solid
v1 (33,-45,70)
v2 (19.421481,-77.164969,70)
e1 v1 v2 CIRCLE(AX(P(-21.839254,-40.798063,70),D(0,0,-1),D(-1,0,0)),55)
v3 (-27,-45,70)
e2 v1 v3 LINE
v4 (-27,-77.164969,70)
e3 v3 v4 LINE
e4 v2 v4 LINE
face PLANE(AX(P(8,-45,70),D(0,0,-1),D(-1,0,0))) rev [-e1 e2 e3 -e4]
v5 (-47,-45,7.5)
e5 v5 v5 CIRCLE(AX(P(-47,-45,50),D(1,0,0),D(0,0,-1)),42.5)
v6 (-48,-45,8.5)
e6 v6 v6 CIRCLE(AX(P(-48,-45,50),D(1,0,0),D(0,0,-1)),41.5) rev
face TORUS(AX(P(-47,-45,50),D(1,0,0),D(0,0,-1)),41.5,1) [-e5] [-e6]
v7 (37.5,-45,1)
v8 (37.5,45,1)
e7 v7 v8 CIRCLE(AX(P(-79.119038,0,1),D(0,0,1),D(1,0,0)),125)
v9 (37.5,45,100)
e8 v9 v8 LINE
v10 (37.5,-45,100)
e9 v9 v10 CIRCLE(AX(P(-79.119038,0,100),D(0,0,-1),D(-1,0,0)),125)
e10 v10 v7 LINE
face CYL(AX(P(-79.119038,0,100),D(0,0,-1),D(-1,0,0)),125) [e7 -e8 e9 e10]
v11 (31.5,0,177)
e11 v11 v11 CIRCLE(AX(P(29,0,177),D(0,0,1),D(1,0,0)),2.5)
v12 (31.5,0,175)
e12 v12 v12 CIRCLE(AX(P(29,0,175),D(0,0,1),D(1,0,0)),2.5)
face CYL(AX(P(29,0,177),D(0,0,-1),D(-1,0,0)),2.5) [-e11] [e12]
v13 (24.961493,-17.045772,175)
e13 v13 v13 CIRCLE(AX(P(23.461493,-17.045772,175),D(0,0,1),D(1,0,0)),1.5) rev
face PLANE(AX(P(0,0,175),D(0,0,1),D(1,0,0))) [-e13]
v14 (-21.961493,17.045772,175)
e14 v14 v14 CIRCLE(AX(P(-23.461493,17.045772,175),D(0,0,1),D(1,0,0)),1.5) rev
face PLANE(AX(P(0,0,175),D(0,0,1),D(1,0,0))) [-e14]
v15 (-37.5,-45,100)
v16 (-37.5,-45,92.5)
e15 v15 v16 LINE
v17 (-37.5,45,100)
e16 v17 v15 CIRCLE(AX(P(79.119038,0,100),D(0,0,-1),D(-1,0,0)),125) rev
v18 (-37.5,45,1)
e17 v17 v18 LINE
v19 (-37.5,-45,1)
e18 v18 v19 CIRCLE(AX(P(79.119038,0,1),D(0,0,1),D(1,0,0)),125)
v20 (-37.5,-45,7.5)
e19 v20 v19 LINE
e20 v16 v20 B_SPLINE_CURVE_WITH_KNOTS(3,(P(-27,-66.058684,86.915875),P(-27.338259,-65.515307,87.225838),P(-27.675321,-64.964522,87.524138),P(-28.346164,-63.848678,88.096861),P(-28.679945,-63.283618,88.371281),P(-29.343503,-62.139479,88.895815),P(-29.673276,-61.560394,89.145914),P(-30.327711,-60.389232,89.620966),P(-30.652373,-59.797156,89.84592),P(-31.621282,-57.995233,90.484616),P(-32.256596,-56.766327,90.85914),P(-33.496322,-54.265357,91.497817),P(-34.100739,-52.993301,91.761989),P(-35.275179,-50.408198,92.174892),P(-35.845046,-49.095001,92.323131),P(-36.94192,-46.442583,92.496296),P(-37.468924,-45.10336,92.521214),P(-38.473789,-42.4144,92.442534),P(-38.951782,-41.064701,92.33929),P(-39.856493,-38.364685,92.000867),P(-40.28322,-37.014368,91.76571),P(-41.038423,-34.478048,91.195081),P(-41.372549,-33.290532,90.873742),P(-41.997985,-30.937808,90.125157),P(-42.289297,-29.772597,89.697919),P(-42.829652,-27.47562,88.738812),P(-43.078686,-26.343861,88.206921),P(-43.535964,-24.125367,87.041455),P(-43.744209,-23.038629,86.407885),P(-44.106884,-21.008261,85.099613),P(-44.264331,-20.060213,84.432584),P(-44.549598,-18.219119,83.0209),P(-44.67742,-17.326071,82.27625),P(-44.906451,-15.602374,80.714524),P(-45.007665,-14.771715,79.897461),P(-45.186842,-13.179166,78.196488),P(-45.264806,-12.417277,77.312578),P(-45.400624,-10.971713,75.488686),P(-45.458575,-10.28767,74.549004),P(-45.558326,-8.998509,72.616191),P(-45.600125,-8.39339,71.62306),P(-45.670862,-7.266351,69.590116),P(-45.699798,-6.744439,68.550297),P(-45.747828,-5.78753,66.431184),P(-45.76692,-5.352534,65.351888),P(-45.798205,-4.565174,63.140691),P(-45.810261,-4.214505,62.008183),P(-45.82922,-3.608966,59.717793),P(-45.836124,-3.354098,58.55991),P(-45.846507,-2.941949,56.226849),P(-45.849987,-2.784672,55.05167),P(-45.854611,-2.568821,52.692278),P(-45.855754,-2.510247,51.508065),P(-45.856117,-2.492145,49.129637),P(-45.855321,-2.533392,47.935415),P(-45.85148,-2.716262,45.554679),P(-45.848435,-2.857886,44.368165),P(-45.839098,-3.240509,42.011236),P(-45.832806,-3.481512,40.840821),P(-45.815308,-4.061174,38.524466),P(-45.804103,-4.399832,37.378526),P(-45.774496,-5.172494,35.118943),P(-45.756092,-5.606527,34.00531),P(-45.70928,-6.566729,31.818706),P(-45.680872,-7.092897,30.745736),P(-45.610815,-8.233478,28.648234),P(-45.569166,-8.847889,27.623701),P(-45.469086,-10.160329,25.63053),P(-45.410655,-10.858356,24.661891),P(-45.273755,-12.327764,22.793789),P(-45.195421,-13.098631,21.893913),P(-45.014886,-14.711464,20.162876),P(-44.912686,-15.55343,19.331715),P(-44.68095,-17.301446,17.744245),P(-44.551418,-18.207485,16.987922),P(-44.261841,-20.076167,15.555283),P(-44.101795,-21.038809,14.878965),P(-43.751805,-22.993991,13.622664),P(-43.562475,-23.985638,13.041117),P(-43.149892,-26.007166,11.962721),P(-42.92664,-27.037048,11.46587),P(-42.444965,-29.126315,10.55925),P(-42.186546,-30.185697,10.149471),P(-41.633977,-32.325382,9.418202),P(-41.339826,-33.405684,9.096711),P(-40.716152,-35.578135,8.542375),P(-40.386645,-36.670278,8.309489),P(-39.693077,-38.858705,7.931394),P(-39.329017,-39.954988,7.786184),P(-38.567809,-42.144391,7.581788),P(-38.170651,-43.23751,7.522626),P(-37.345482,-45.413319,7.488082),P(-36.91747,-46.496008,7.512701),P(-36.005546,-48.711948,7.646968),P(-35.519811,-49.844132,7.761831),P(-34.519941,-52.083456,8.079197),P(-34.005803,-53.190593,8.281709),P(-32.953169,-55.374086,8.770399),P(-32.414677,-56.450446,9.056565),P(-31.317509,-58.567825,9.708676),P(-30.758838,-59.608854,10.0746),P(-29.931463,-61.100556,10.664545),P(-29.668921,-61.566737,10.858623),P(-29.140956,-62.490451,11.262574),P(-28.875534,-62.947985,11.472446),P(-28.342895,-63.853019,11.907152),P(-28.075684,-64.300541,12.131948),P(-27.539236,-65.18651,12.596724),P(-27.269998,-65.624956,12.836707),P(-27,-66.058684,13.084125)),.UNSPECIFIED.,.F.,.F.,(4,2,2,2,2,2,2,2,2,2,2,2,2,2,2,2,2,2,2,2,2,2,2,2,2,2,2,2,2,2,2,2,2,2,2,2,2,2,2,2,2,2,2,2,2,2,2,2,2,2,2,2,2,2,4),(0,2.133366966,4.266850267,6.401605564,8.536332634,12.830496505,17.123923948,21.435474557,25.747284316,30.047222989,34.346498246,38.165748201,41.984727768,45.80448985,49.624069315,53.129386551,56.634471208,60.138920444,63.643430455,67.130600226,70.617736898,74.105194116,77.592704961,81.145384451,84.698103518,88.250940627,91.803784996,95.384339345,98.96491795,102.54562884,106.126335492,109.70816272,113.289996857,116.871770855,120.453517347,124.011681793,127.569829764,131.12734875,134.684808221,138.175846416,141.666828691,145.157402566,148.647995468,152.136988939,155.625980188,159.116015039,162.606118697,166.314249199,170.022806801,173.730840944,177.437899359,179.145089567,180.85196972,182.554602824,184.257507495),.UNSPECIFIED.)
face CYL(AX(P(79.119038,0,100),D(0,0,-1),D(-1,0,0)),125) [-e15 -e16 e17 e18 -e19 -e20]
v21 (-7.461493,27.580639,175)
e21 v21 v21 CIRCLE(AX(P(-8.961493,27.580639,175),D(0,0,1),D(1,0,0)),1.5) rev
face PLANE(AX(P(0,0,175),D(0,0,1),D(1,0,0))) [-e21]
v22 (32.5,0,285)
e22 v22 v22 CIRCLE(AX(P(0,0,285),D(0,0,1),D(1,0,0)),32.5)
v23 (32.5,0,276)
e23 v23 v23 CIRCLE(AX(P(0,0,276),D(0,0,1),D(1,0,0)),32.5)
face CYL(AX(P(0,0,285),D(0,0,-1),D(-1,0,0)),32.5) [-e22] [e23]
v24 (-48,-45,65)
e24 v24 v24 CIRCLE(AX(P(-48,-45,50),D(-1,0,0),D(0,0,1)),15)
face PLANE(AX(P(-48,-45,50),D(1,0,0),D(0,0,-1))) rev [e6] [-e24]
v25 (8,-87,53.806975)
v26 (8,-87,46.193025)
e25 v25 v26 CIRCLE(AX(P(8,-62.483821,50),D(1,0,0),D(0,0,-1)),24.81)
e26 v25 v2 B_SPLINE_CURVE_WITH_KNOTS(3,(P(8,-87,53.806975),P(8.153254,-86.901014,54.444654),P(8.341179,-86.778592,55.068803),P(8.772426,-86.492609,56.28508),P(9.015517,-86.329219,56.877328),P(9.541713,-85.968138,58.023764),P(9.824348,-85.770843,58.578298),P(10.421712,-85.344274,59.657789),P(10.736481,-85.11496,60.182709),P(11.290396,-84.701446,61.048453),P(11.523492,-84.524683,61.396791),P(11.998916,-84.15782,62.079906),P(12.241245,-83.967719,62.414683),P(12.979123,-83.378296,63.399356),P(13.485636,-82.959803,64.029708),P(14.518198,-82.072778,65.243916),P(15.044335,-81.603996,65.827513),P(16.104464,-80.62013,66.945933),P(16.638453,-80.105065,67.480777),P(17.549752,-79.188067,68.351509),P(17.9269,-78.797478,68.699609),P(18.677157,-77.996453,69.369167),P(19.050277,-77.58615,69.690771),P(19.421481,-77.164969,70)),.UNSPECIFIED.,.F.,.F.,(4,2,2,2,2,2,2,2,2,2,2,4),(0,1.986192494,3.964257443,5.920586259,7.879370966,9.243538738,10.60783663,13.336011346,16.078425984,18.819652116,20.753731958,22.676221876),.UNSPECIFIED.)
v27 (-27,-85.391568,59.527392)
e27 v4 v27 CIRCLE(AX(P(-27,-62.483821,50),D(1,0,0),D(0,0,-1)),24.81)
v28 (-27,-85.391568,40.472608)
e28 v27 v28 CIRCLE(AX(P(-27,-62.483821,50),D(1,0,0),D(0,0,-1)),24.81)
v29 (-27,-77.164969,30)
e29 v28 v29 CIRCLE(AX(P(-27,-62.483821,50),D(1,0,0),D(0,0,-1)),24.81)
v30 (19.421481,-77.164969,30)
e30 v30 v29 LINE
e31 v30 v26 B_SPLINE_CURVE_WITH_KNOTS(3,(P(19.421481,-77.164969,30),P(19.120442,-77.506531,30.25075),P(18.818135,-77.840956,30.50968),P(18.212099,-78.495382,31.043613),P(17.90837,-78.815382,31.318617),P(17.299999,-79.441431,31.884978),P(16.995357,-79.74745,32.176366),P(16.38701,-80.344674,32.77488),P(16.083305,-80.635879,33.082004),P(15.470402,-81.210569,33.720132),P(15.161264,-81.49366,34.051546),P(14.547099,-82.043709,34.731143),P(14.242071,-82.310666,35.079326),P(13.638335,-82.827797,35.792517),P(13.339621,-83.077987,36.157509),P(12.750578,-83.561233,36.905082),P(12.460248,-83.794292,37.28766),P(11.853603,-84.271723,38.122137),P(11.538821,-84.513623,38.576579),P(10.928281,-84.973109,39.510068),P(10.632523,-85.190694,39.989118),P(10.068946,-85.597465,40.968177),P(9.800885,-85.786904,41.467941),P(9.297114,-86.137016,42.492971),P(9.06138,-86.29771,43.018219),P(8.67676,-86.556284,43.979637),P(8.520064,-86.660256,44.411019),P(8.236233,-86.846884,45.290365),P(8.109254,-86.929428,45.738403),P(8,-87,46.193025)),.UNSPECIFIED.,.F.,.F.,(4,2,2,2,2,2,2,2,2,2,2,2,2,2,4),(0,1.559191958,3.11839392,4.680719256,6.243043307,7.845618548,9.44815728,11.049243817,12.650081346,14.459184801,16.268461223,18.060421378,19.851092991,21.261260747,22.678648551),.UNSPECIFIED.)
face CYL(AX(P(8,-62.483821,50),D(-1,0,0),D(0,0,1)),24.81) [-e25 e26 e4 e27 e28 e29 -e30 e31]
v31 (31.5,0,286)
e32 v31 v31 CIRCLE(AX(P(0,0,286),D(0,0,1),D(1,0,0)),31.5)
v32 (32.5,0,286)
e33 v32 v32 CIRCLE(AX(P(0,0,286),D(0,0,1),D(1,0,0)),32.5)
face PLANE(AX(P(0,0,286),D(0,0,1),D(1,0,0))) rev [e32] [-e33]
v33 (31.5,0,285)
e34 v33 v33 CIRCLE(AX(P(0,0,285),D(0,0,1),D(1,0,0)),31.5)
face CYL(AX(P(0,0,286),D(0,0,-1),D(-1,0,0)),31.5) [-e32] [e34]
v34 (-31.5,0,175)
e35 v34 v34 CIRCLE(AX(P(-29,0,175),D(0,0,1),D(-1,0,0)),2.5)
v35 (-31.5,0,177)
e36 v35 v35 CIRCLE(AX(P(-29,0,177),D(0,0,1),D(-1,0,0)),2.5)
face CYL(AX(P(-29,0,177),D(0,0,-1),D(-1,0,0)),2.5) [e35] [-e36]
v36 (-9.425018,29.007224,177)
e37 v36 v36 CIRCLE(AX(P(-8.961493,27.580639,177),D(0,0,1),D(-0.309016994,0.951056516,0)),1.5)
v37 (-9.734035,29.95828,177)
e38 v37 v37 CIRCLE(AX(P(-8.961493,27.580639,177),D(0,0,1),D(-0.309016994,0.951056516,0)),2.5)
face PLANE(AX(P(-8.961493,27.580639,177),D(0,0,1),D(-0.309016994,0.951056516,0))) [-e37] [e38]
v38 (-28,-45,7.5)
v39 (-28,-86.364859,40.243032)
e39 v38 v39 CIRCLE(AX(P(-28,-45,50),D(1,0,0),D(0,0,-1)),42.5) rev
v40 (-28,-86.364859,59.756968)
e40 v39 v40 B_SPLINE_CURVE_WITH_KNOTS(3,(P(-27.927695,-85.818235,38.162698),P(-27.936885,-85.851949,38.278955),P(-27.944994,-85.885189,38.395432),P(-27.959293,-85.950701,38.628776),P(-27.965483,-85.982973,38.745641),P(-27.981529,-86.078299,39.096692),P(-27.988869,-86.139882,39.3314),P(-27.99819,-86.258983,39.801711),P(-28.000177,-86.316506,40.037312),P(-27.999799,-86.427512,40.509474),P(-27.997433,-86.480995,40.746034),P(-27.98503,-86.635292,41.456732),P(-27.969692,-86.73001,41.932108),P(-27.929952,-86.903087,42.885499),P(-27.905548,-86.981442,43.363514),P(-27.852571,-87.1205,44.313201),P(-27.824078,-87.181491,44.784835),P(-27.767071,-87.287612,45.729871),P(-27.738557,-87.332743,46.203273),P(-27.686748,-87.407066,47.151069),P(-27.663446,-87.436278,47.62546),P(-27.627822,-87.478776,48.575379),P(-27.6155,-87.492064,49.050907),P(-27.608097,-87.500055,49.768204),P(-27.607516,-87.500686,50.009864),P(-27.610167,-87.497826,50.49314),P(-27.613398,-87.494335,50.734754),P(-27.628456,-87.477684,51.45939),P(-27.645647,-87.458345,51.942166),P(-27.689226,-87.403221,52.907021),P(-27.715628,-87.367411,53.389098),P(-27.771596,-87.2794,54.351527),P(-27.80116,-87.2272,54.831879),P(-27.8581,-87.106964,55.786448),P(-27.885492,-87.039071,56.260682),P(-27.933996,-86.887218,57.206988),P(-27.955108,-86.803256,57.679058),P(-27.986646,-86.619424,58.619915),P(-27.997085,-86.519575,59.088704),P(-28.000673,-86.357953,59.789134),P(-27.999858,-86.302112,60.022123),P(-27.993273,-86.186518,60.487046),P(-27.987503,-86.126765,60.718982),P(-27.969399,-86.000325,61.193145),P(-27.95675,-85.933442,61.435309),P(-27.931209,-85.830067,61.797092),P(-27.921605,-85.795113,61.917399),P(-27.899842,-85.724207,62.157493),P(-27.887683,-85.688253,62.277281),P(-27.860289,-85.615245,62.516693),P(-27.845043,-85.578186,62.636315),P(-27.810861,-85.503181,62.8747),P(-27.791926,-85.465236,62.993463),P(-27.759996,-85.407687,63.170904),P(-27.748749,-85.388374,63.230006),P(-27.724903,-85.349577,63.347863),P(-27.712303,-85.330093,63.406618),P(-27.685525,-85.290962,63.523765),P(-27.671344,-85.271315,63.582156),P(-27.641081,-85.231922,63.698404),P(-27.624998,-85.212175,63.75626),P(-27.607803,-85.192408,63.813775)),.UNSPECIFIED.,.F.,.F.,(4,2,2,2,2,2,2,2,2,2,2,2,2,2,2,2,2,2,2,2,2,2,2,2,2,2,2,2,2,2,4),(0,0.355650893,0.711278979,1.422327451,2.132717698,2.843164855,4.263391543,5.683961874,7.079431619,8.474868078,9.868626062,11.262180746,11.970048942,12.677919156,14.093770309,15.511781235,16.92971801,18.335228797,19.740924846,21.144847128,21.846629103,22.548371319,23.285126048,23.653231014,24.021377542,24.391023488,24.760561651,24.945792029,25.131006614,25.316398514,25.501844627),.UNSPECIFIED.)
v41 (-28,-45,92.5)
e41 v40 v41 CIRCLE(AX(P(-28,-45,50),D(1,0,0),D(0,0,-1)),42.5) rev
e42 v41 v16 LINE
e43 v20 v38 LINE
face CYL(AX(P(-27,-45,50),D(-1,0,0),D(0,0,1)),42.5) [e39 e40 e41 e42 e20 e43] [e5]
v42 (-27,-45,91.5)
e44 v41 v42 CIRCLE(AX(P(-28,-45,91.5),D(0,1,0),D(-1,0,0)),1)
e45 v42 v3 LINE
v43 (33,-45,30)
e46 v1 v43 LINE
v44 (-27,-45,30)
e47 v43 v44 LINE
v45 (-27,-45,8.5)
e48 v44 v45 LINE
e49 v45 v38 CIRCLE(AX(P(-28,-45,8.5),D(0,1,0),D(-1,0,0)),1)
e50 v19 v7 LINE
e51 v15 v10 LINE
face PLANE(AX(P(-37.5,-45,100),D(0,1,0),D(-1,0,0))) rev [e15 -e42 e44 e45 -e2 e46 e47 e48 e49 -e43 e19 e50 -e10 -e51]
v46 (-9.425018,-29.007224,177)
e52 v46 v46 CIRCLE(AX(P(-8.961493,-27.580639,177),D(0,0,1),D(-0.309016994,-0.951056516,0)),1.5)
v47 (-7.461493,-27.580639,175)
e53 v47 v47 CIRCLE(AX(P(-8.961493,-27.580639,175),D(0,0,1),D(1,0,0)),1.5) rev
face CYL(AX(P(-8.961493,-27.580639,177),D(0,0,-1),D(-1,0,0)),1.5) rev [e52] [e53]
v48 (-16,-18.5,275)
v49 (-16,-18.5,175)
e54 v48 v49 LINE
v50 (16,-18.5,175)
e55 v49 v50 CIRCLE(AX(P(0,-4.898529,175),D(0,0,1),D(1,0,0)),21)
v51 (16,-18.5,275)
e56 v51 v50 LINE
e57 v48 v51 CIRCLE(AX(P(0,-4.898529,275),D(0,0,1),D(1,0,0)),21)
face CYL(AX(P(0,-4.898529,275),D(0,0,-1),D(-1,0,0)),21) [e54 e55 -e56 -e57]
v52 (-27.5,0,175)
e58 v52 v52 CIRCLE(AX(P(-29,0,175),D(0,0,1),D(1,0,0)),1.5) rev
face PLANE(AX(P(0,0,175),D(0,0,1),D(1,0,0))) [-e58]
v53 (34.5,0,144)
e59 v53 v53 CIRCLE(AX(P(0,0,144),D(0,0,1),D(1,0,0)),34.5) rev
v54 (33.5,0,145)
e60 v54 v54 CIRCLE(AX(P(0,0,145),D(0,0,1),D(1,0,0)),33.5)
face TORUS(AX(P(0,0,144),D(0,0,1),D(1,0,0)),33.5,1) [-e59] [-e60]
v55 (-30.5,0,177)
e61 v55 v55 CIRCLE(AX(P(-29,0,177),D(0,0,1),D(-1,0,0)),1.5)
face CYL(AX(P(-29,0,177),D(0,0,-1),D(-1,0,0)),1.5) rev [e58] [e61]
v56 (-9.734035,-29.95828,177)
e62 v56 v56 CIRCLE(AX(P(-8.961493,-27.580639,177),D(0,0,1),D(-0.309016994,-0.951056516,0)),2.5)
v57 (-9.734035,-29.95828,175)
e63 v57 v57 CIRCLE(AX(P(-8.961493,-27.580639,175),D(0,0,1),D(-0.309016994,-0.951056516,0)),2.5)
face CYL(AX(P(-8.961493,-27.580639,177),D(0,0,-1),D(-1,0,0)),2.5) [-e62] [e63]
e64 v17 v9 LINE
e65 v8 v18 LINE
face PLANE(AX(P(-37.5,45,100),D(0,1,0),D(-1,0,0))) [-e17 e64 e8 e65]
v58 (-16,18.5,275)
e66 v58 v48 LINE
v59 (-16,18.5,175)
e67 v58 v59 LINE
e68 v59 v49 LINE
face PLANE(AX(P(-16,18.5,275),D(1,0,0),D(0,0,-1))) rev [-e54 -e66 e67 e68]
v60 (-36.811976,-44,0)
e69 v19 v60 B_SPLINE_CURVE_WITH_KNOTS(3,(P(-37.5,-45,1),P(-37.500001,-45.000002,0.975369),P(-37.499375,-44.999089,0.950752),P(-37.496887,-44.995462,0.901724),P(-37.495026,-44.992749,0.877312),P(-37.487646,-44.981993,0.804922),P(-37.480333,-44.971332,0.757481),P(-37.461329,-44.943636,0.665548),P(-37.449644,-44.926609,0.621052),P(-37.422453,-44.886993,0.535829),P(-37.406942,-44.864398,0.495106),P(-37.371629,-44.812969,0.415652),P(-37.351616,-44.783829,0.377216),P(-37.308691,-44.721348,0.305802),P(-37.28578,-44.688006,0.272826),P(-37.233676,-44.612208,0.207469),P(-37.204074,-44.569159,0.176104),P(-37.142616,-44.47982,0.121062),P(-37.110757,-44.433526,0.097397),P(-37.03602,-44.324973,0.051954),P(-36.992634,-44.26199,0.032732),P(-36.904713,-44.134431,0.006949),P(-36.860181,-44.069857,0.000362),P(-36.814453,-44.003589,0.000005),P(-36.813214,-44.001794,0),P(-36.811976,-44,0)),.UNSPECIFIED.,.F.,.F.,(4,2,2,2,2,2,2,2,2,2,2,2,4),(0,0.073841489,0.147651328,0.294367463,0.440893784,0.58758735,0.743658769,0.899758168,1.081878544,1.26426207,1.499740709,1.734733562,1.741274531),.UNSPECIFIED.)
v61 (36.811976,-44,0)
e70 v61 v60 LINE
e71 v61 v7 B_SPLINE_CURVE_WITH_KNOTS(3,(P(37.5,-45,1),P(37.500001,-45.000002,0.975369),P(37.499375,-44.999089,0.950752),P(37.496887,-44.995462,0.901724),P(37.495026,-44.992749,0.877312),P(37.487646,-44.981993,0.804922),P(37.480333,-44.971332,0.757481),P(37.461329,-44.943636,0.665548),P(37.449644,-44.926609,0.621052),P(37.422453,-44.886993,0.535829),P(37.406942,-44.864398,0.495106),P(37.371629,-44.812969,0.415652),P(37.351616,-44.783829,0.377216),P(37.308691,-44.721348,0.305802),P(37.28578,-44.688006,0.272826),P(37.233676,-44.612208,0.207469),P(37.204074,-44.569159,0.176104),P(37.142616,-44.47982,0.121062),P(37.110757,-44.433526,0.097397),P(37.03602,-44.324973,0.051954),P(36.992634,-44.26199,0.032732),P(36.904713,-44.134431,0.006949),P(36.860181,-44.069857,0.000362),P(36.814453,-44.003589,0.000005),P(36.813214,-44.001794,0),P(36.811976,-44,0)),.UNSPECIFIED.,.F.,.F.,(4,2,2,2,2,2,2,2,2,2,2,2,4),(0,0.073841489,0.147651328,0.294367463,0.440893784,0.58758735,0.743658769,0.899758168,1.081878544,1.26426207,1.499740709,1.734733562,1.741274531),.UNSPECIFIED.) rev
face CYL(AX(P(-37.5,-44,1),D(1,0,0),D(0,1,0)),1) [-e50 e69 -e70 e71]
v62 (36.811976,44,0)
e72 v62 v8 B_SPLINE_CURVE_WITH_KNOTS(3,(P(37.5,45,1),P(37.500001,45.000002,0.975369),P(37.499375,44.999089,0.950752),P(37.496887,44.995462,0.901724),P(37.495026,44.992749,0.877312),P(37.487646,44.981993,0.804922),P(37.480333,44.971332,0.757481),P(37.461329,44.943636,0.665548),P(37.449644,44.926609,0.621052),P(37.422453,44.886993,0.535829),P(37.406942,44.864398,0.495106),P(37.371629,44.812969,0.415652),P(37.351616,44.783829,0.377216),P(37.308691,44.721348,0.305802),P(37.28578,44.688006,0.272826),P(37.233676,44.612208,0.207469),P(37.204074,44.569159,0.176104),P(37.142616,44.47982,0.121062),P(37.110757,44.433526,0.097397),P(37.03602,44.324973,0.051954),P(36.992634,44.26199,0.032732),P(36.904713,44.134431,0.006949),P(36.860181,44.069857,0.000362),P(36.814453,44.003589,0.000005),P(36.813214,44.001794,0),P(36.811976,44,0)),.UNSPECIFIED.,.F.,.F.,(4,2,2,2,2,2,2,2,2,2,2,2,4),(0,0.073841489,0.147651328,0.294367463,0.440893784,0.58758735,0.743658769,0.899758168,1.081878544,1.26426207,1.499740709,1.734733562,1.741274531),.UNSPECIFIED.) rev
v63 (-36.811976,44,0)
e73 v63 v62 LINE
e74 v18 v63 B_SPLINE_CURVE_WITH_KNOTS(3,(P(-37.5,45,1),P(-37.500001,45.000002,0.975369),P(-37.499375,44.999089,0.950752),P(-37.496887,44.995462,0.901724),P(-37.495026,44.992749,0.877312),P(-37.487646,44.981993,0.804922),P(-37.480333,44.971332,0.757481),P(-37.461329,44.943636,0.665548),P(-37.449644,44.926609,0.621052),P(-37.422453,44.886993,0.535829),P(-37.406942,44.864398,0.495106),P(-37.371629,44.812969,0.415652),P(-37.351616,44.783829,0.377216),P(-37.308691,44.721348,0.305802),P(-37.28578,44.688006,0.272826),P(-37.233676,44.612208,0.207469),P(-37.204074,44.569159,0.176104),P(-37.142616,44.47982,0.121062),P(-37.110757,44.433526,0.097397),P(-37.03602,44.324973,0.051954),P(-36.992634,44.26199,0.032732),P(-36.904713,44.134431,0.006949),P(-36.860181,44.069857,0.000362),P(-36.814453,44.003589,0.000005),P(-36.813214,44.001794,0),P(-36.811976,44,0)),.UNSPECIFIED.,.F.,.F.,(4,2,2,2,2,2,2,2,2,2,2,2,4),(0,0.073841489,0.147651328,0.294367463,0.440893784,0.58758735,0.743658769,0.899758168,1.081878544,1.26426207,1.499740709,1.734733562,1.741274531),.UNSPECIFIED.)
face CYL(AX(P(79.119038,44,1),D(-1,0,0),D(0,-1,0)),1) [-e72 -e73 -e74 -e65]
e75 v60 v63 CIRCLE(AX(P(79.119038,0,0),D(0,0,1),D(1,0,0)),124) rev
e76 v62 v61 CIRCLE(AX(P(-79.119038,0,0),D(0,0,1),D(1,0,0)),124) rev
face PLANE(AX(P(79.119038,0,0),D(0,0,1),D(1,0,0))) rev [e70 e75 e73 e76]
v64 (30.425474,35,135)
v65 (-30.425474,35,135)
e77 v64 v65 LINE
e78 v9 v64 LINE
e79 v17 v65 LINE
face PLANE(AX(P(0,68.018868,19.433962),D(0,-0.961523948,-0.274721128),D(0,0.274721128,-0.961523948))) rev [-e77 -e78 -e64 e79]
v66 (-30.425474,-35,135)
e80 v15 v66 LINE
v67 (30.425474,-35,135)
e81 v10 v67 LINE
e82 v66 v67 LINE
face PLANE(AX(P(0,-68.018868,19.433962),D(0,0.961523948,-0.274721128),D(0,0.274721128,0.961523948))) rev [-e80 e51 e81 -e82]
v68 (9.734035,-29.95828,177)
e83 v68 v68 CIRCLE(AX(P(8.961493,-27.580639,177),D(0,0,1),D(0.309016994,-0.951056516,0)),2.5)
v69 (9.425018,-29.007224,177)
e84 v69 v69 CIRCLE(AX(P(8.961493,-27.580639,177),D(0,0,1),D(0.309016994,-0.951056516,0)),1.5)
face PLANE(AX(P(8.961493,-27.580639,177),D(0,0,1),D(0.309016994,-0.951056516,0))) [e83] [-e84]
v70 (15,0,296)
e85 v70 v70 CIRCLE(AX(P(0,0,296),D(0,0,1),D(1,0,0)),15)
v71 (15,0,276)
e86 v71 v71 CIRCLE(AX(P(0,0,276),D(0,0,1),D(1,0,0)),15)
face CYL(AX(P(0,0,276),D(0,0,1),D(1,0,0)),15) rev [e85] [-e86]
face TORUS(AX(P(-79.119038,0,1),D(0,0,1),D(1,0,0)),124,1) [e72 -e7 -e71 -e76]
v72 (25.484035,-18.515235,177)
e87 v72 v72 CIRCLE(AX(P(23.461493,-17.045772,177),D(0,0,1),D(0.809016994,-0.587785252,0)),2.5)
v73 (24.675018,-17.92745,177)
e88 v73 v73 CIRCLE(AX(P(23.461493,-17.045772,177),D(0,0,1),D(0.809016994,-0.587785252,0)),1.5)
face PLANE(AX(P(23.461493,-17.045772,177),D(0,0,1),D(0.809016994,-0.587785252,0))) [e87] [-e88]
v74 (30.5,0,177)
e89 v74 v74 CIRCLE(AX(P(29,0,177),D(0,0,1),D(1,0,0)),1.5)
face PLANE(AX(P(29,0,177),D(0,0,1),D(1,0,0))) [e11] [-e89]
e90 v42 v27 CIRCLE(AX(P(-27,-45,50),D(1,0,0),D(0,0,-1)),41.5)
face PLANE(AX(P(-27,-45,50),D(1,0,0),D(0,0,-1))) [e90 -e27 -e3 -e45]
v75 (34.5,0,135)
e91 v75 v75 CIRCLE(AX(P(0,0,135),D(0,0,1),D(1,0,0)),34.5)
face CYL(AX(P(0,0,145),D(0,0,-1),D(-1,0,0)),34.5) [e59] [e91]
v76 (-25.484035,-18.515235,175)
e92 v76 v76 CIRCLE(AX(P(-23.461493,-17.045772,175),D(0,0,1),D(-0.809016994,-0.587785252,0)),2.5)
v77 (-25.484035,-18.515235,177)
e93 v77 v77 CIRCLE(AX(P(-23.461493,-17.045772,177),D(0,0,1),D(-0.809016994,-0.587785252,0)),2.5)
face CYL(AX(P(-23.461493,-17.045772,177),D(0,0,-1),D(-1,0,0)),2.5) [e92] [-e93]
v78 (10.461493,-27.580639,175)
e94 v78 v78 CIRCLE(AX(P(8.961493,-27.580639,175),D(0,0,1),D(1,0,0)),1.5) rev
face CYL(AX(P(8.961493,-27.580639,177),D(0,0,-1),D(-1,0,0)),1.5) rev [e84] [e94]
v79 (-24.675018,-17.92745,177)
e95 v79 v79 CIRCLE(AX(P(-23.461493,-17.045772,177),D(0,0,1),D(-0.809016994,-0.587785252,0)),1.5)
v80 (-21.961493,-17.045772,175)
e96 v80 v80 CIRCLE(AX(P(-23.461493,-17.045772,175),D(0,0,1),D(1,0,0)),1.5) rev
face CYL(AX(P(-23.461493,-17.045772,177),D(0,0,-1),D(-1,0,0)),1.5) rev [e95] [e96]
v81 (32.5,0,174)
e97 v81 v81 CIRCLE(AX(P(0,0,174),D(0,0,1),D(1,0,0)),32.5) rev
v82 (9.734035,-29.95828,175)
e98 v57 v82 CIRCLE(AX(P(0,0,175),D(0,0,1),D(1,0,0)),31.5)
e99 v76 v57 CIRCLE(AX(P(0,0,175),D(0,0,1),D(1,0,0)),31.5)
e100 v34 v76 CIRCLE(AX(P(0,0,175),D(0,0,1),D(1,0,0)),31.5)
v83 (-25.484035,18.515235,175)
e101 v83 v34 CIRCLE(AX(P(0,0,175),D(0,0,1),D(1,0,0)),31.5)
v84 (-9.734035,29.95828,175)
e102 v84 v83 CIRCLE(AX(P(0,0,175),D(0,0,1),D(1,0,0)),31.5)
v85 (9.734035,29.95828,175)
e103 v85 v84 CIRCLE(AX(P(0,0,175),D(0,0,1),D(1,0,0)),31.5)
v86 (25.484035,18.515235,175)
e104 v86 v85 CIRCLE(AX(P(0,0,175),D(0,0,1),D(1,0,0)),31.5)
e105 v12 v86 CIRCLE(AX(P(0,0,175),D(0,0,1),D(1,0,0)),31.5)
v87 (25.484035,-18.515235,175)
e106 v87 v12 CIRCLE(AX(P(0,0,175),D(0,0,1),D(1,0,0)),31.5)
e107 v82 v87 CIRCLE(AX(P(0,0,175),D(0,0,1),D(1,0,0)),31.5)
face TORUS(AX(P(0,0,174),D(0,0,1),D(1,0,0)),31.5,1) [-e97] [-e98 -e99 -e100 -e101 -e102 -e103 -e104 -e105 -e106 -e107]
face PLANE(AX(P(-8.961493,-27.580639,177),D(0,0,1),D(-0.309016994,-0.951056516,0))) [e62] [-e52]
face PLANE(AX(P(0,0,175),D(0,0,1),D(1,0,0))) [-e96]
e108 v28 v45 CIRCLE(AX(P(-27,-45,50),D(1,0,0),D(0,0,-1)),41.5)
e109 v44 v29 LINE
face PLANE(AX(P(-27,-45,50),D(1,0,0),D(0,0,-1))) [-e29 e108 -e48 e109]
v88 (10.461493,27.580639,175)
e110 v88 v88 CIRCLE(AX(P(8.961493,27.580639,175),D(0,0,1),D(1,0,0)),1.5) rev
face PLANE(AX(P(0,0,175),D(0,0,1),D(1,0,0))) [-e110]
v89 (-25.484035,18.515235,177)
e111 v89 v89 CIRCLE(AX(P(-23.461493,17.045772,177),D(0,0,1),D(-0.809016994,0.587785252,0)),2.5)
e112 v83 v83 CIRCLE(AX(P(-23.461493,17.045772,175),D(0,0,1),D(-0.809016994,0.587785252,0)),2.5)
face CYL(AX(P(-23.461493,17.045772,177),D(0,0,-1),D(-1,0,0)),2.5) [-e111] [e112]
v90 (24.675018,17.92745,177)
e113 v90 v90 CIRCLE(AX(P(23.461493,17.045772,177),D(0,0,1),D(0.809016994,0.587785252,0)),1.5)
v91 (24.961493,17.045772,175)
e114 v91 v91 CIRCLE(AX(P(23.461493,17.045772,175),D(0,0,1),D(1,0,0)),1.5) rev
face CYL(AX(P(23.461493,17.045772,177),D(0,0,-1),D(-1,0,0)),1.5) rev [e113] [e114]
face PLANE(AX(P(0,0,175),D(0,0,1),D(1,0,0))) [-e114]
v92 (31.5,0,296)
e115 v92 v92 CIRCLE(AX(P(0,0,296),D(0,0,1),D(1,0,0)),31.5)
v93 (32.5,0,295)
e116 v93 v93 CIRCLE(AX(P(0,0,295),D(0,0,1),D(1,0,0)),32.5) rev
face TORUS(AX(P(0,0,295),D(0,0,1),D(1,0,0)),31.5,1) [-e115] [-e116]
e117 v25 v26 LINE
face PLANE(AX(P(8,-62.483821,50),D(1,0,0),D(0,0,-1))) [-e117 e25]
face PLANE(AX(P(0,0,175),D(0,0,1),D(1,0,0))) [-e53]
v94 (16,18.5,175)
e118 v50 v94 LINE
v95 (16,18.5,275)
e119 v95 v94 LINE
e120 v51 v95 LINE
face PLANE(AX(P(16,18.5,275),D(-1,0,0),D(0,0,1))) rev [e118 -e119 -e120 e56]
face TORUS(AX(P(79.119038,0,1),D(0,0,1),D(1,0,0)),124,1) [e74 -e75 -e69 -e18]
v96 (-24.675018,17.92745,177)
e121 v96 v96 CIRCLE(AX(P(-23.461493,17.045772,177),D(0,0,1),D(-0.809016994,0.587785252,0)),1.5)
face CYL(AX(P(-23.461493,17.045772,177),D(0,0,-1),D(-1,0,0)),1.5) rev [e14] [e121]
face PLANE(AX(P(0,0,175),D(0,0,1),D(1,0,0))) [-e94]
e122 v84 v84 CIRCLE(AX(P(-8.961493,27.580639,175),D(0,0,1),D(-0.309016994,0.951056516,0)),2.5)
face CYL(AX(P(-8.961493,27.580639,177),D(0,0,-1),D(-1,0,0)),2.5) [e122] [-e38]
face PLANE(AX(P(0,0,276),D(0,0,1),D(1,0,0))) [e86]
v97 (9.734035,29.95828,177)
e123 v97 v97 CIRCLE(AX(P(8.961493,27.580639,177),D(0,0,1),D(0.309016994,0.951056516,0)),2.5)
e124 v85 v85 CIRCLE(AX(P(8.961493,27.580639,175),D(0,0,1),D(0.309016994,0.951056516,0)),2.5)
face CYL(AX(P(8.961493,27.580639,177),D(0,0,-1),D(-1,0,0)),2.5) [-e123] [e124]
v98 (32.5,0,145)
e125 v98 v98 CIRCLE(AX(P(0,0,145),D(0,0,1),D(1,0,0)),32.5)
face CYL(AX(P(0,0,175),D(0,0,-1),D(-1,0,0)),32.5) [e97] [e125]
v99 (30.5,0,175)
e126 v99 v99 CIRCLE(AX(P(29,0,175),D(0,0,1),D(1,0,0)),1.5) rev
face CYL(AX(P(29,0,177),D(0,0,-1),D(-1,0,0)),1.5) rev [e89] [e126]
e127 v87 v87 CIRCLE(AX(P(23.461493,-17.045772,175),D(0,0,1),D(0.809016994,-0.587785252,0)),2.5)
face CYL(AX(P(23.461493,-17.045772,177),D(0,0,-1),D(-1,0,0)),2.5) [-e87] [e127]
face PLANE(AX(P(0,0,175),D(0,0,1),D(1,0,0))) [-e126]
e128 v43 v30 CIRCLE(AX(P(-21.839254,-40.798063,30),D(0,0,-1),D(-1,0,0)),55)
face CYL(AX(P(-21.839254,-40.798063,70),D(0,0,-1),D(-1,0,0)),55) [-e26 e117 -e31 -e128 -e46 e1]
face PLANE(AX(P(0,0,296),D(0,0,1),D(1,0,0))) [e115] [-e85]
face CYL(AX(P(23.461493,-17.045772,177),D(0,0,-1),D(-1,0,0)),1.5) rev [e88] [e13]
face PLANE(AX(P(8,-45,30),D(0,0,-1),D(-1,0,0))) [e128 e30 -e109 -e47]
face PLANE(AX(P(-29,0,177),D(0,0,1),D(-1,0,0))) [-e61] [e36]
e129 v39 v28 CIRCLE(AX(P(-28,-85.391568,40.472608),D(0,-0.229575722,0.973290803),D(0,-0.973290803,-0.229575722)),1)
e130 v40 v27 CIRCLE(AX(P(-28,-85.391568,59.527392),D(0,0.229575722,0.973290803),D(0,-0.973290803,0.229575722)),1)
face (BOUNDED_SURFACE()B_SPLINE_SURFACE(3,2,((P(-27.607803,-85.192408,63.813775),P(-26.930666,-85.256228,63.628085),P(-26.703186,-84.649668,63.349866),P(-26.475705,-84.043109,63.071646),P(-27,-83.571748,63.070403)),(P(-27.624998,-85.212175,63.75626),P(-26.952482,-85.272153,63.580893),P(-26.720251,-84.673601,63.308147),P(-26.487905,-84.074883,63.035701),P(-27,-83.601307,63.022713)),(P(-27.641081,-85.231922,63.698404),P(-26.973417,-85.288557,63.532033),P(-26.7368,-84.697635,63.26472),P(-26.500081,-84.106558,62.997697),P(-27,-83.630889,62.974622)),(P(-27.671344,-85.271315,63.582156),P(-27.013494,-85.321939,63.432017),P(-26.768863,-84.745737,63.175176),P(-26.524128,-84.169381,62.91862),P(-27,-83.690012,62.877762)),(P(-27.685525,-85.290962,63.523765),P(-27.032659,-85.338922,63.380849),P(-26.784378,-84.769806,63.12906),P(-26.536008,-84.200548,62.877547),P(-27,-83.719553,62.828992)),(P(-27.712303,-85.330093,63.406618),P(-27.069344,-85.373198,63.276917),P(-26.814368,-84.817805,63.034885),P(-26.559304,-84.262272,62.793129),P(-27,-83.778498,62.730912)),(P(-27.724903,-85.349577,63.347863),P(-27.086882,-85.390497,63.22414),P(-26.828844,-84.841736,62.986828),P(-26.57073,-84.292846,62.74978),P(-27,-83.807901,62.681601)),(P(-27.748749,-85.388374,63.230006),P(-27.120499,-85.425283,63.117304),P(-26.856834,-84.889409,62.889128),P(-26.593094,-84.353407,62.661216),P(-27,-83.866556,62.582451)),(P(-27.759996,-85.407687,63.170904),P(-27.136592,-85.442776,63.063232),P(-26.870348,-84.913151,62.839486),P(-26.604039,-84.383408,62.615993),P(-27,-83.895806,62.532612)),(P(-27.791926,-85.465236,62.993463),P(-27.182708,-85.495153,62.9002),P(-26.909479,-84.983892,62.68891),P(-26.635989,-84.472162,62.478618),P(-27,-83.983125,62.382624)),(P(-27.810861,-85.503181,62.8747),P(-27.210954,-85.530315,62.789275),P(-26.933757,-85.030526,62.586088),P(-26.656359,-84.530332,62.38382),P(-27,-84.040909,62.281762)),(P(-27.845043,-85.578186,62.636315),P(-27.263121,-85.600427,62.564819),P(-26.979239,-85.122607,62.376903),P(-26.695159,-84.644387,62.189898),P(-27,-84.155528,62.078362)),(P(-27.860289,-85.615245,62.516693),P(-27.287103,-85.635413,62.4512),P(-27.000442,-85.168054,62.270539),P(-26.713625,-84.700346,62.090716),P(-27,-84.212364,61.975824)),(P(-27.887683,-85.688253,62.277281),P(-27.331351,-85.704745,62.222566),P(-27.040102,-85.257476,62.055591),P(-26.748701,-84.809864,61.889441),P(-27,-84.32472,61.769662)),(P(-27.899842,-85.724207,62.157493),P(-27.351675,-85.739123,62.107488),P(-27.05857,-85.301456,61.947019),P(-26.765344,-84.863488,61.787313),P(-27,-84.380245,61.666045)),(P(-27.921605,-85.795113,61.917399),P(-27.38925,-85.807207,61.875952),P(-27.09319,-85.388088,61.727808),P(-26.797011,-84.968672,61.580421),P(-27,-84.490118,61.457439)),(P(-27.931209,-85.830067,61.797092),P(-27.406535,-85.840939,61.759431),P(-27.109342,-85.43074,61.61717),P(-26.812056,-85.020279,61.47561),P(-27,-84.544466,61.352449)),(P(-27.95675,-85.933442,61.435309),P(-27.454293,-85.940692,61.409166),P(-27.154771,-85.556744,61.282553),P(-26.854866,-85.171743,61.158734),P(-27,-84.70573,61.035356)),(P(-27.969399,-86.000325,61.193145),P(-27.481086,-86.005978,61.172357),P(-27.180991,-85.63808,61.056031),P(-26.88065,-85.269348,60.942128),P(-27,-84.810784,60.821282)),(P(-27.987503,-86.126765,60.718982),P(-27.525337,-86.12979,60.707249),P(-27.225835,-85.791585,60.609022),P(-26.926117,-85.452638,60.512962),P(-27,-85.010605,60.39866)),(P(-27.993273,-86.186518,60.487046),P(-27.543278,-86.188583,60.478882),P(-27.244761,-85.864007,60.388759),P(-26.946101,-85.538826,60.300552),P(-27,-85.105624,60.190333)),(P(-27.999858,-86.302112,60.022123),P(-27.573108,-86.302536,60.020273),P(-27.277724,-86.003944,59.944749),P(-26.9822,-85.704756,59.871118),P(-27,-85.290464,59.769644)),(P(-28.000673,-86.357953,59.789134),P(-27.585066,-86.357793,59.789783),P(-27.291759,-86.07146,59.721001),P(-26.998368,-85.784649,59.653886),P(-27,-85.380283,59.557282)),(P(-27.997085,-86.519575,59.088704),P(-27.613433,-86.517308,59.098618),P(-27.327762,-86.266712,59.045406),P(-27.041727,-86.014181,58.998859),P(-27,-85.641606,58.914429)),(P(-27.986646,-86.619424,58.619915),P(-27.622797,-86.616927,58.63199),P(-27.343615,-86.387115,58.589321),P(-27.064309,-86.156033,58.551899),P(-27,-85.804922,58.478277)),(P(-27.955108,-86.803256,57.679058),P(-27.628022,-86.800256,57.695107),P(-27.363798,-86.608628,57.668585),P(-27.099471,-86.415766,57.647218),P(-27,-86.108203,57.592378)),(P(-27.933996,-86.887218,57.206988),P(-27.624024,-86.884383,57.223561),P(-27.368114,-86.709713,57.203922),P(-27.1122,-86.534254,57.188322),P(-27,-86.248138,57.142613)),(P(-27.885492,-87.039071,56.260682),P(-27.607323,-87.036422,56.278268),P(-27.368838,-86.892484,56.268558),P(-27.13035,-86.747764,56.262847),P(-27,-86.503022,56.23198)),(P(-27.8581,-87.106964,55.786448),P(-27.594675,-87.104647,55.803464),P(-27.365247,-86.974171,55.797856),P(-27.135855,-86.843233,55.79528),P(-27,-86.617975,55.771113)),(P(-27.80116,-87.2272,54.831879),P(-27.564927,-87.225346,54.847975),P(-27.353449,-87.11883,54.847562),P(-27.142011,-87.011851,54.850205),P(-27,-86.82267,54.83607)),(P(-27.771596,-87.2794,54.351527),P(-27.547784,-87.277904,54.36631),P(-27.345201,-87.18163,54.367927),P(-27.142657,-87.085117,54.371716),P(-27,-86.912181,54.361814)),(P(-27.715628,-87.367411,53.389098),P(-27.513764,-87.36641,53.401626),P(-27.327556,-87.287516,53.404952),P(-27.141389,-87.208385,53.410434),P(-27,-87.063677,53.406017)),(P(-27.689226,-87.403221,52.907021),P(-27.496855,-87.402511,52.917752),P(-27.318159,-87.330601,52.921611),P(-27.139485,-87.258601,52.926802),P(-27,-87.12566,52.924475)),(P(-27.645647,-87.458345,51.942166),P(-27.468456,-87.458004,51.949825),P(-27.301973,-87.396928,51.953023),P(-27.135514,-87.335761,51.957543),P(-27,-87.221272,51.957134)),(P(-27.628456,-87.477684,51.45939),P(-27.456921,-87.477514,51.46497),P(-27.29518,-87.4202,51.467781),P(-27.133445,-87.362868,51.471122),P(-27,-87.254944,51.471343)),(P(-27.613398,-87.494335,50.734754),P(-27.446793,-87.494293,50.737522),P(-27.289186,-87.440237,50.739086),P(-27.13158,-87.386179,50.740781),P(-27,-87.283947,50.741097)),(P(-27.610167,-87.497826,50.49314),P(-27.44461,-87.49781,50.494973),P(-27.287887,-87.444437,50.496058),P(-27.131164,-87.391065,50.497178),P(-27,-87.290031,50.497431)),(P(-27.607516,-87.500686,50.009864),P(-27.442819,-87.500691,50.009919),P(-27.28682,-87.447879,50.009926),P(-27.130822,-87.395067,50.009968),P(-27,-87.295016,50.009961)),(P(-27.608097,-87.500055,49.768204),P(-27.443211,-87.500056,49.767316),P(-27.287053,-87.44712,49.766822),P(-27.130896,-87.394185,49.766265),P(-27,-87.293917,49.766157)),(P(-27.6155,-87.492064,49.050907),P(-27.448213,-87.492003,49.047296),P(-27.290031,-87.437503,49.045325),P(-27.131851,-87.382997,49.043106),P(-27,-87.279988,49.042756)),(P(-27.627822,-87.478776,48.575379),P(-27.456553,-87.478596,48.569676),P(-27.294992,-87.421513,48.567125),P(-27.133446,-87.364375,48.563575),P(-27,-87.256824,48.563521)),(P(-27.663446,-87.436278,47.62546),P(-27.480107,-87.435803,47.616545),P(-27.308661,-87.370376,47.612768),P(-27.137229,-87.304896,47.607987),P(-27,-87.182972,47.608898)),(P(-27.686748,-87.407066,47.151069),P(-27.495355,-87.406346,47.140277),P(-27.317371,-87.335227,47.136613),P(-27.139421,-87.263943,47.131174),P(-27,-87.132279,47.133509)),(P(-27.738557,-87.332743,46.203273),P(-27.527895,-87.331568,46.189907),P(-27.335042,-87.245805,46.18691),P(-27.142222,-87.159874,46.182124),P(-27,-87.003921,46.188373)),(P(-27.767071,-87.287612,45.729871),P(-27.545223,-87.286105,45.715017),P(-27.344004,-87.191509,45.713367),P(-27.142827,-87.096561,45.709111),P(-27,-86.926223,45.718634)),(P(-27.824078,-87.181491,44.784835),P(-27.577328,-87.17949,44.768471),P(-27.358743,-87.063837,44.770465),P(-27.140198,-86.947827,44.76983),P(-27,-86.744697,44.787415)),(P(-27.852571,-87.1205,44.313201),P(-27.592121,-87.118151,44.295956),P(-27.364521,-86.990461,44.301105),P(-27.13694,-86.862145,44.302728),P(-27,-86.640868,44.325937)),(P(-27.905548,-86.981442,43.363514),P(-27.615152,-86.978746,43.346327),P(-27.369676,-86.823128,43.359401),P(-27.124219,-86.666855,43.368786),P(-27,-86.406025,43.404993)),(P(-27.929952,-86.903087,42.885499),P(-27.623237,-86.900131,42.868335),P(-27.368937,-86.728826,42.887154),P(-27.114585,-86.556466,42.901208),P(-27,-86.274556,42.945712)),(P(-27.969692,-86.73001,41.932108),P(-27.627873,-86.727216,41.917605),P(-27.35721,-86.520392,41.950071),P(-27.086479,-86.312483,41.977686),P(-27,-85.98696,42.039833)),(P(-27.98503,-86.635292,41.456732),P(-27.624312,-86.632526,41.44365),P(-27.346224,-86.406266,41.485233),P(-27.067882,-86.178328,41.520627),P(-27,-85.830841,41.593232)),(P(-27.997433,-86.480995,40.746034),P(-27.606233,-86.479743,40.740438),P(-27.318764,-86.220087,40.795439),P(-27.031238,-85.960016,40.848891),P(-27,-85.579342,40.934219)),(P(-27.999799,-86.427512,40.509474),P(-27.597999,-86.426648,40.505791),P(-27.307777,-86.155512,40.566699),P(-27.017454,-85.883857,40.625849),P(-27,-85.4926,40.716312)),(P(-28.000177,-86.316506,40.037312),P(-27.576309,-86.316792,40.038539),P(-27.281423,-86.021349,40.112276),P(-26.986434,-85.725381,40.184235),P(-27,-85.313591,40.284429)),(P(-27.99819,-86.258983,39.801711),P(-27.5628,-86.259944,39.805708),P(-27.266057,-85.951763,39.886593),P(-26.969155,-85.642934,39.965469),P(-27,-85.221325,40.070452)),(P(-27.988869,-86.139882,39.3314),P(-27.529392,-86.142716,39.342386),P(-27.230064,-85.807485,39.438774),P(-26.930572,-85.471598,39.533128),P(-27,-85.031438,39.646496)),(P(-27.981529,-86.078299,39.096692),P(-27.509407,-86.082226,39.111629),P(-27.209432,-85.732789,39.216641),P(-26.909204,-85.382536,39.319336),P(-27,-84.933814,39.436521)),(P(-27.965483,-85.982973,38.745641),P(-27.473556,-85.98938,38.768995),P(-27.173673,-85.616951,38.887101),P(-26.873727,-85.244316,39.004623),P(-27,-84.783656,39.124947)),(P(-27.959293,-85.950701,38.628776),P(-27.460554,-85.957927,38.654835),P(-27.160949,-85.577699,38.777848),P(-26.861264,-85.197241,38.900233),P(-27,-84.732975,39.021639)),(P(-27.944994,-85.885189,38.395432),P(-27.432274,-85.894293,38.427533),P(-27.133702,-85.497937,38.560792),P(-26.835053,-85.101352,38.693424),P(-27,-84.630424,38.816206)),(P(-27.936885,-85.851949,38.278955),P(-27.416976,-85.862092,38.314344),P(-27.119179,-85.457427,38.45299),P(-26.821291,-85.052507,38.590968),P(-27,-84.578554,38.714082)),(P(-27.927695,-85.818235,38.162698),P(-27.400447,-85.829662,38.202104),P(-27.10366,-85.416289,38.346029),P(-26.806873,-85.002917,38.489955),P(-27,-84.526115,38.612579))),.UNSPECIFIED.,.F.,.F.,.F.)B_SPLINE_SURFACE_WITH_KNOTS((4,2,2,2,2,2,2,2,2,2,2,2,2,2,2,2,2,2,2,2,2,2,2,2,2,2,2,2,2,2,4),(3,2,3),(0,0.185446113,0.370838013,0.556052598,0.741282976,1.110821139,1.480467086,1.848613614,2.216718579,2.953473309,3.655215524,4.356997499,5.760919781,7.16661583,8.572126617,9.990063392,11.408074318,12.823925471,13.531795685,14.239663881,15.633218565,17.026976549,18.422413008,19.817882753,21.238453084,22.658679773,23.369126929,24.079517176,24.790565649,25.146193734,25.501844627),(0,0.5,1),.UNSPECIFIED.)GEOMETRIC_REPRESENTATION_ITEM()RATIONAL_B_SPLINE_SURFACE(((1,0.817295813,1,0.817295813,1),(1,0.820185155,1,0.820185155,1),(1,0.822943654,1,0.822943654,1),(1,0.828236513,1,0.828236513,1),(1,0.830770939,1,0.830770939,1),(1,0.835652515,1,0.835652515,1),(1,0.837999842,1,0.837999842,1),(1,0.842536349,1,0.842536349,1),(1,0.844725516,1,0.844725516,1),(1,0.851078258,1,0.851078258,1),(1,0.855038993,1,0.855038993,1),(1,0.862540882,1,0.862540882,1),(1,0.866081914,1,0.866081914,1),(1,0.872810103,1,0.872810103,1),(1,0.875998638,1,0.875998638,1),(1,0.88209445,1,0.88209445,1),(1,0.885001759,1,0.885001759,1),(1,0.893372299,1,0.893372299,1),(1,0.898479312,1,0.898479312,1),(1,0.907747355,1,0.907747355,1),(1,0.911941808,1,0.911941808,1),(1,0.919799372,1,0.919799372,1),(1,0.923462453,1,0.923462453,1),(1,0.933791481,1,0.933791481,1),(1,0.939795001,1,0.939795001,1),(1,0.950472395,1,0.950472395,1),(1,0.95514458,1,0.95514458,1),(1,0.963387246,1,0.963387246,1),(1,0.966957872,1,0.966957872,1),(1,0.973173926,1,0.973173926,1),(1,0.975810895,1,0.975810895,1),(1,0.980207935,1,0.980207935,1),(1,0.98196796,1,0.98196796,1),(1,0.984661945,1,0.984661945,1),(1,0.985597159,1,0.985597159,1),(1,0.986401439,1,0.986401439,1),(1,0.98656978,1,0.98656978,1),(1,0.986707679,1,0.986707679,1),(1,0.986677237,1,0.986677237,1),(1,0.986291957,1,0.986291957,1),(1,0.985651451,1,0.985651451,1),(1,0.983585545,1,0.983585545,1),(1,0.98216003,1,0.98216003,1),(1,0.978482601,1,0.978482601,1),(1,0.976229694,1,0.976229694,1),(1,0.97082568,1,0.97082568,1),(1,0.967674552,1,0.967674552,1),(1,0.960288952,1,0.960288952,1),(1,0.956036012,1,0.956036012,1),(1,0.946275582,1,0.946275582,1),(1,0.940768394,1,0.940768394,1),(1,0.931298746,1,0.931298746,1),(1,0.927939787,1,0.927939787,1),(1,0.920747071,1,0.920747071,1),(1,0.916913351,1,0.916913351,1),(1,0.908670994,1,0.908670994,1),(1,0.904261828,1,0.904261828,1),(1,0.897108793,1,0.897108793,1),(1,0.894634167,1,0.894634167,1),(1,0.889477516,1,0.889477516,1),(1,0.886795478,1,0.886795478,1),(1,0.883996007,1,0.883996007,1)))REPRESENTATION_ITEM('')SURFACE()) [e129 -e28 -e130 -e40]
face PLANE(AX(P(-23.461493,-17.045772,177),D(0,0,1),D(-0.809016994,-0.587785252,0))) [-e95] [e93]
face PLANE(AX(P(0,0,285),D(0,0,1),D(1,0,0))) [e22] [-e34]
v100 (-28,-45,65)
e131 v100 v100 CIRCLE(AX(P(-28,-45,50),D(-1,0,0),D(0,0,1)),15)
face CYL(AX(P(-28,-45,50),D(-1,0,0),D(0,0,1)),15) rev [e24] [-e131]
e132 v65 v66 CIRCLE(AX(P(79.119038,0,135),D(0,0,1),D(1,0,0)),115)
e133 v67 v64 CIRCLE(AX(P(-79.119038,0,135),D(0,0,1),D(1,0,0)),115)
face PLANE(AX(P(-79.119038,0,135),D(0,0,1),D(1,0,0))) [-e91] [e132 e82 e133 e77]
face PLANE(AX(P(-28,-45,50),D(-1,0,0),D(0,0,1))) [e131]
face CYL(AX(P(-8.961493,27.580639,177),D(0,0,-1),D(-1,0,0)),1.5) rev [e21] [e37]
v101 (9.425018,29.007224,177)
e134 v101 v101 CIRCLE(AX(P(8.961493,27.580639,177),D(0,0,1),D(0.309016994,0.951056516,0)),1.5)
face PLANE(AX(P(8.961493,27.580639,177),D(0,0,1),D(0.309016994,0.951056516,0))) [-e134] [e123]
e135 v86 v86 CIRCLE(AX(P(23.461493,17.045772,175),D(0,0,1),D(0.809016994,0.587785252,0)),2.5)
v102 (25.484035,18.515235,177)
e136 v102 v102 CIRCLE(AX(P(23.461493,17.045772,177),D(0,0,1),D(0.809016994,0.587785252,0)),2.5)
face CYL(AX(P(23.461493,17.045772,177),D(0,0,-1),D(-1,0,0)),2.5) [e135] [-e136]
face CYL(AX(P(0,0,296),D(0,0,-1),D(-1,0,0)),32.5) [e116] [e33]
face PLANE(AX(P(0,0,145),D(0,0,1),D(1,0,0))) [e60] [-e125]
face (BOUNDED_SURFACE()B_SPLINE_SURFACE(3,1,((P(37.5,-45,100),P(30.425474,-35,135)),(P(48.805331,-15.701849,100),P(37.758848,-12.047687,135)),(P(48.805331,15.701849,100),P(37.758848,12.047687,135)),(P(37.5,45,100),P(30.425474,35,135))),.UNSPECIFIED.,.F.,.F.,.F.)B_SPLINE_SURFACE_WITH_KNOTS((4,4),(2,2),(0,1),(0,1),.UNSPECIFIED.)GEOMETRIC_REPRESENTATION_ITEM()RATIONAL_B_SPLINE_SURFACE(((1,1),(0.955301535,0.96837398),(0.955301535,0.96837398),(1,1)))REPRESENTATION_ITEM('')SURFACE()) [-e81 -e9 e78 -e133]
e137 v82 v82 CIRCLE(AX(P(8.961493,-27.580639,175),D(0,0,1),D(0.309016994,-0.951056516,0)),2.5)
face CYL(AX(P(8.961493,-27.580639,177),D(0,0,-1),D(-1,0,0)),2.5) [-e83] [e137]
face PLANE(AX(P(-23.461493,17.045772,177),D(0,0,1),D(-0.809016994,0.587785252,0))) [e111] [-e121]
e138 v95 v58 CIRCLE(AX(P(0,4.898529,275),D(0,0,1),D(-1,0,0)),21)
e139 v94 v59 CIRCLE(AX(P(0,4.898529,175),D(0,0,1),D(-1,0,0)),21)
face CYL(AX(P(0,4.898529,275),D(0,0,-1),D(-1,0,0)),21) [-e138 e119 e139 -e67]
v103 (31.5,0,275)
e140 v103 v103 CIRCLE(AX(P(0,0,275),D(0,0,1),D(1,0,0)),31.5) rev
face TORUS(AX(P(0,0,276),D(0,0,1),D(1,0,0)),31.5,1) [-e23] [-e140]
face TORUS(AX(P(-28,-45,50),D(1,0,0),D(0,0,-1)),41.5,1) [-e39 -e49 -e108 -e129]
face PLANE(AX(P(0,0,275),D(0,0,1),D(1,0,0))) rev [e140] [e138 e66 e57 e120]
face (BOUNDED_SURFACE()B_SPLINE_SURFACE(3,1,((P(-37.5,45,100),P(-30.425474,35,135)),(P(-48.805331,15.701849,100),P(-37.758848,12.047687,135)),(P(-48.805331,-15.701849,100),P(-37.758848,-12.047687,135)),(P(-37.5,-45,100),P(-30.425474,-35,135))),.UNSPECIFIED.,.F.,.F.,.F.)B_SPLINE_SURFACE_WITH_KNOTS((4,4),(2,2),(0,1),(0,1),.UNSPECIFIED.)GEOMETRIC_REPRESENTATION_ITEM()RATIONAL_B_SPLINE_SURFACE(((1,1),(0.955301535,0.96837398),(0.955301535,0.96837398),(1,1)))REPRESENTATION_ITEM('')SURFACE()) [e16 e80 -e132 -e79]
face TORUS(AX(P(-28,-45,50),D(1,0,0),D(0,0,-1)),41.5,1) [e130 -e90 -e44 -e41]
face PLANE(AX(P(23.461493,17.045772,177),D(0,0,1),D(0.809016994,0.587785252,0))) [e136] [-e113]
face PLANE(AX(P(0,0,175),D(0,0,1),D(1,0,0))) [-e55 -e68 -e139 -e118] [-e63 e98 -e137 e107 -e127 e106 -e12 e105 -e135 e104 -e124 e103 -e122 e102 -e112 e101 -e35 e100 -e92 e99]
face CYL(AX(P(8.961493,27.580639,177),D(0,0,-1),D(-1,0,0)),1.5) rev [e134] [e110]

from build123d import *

# Parameters (mm, degrees)
BOSS_EXTRUDE1_DEPTH  = 100
SKETCH4_R            = 34.5
BOSS_EXTRUDE2_DEPTH  = 10
SKETCH5_R            = 32.5
BOSS_EXTRUDE3_DEPTH  = 30
SKETCH6_R            = 2.5
SKETCH6_R_2          = 1.5
BOSS_EXTRUDE4_DEPTH  = 2
CIRPATTERN2_COUNT    = 10
BOSS_EXTRUDE5_DEPTH  = 100
SKETCH8_R            = 32.5
BOSS_EXTRUDE6_DEPTH  = 10
SKETCH9_R            = 31.5
BOSS_EXTRUDE7_DEPTH  = 1
SKETCH10_R           = 32.5
BOSS_EXTRUDE8_DEPTH  = 10
SKETCH11_R           = 42.5
BOSS_EXTRUDE9_DEPTH  = 10.5
BOSS_EXTRUDE10_DEPTH = 35
BOSS_EXTRUDE11_DEPTH = 20
CUT_EXTRUDE1_DEPTH   = 40
CUT_EXTRUDE2_DEPTH   = 40
FILLET1_R            = 1
FILLET2_R            = 1
FILLET3_R            = 1
FILLET4_R            = 1
SKETCH17_R           = 15
CUT_EXTRUDE3_DEPTH   = 20
SKETCH18_R           = 15
CUT_EXTRUDE4_DEPTH   = 20


with BuildPart() as part:
    # Sketch1 → Boss-Extrude1 (new body)
    with BuildSketch(Plane.XY):
        with BuildLine():
            Line((-37.5, 45), (37.5, 45))
            ThreePointArc((37.5, 45), (45.880962103, 0), (37.5, -45))
            Line((37.5, -45), (-37.5, -45))
            ThreePointArc((-37.5, -45), (-45.880962103, 0), (-37.5, 45))
        make_face()
    extrude(amount=BOSS_EXTRUDE1_DEPTH)

    # Sketch2 for Loft1 → Loft1 section 0
    with BuildSketch(Plane.XY.offset(100)):
        with BuildLine():
            Line((-37.5, -45), (37.5, -45))
            # circular arc as an exact rational Bezier (weights 1, cos(half-angle), 1)
            Bezier((37.5, -45), (54.864231746, 0), (37.5, 45), weights=[1, 0.932952303, 1])
            Line((37.5, 45), (-37.5, 45))
            Bezier((-37.5, 45), (-54.864231746, 0), (-37.5, -45), weights=[1, 0.932952303, 1])
        make_face()
    # Sketch3 for Loft1 → Loft1 section 1
    with BuildSketch(Plane.XY.offset(135)):
        with BuildLine():
            Line((30.425473604, 35), (-30.425473604, 35))
            Bezier((-30.425473604, 35), (-41.608142487, 0), (-30.425473604, -35), weights=[1, 0.95256097, 1])
            Line((-30.425473604, -35), (30.425473604, -35))
            Bezier((30.425473604, -35), (41.608142487, 0), (30.425473604, 35), weights=[1, 0.95256097, 1])
        make_face()
    loft()

    # Sketch4 → Boss-Extrude2 (add)
    with BuildSketch(Plane.XY.offset(135)):
        Circle(SKETCH4_R)
    extrude(amount=BOSS_EXTRUDE2_DEPTH)

    # Sketch5 → Boss-Extrude3 (add)
    with BuildSketch(Plane.XY.offset(145)):
        Circle(SKETCH5_R)
    extrude(amount=BOSS_EXTRUDE3_DEPTH)

    # Sketch6 → Boss-Extrude4 (add)
    with BuildSketch(Plane.XY.offset(175)):
        with Locations((29, 0)):
            Circle(SKETCH6_R)
        with Locations((29, 0)):
            Circle(SKETCH6_R_2, mode=Mode.SUBTRACT)
    boss_extrude4 = extrude(amount=BOSS_EXTRUDE4_DEPTH)

    # CirPattern2: Boss-Extrude4 ×10 about axis
    cirpattern2_axis = Axis((0, 0, 0), (0, 0, 1))
    for i in range(1, CIRPATTERN2_COUNT):
        add(boss_extrude4.rotate(cirpattern2_axis, i * 360 / CIRPATTERN2_COUNT))

    # Sketch7 → Boss-Extrude5 (add)
    with BuildSketch(Plane.XY.offset(175)):
        with BuildLine():
            Line((16, 18.5), (16, -18.5))
            ThreePointArc((16, -18.5), (0, -25.898529491), (-16, -18.5))
            Line((-16, -18.5), (-16, 18.5))
            ThreePointArc((-16, 18.5), (0, 25.898529491), (16, 18.5))
        make_face()
    extrude(amount=BOSS_EXTRUDE5_DEPTH)

    # Sketch8 → Boss-Extrude6 (add)
    with BuildSketch(Plane.XY.offset(275)):
        Circle(SKETCH8_R)
    extrude(amount=BOSS_EXTRUDE6_DEPTH)

    # Sketch9 → Boss-Extrude7 (add)
    with BuildSketch(Plane.XY.offset(285)):
        Circle(SKETCH9_R)
    extrude(amount=BOSS_EXTRUDE7_DEPTH)

    # Sketch10 → Boss-Extrude8 (add)
    with BuildSketch(Plane.XY.offset(286)):
        Circle(SKETCH10_R)
    extrude(amount=BOSS_EXTRUDE8_DEPTH)

    # Sketch11 → Boss-Extrude9 (add, symmetric)
    with BuildSketch(Plane(origin=(-37.5, 0, 0), x_dir=(0, 0, -1), z_dir=(1, 0, 0))):
        with Locations((-50, -45)):
            Circle(SKETCH11_R)
    extrude(amount=BOSS_EXTRUDE9_DEPTH, both=True)

    # Sketch12 → Boss-Extrude10 (add)
    with BuildSketch(Plane(origin=(-27, 0, 0), x_dir=(0, 0, -1), z_dir=(1, 0, 0))):
        with BuildLine():
            Line((-70, -45), (-70, -77.164968675))
            ThreePointArc((-70, -77.164968675), (-50, -87.2938209), (-30, -77.164968675))
            Line((-30, -77.164968675), (-30, -45))
            Line((-30, -45), (-70, -45))
        make_face()
    extrude(amount=BOSS_EXTRUDE10_DEPTH)

    # Sketch13 → Boss-Extrude11 (add, symmetric)
    with BuildSketch(Plane.XY.offset(50)):
        with BuildLine():
            Line((8, -45), (8, -87))
            ThreePointArc((8, -87), (25.421855105, -68.929675658), (33, -45))
            Line((33, -45), (8, -45))
        make_face()
    extrude(amount=BOSS_EXTRUDE11_DEPTH, both=True)

    # Sketch15 → Cut-Extrude1 (cut)
    with BuildSketch(Plane.ZY.offset(-8)):
        with BuildLine():
            Line((70, -87), (70, -77.164968675))
            ThreePointArc((70, -77.164968675), (62.879246123, -83.689035336), (53.806975482, -87))
            Line((53.806975482, -87), (70, -87))
        make_face()
    extrude(amount=-CUT_EXTRUDE1_DEPTH, mode=Mode.SUBTRACT)

    # Sketch16 → Cut-Extrude2 (cut)
    with BuildSketch(Plane.ZY.offset(-8)):
        with BuildLine():
            Line((30, -87), (46.193024518, -87))
            ThreePointArc((46.193024518, -87), (37.120753877, -83.689035336), (30, -77.164968675))
            Line((30, -77.164968675), (30, -87))
        make_face()
    extrude(amount=-CUT_EXTRUDE2_DEPTH, mode=Mode.SUBTRACT)

    # Fillet1
    fillet1_edges = [part.edges().sort_by_distance(p)[0] for p in [
        (0, 45, 0),
        (45.880962103, 0, 0),
        (0, -45, 0),
        (-45.880962103, 0, 0),
    ]]
    fillet(fillet1_edges, radius=FILLET1_R)

    # Fillet2
    fillet2_edges = [part.edges().sort_by_distance(p)[0] for p in [
        (-48, -45, 92.5),
        (-27, -87.5, 50),
    ]]
    fillet(fillet2_edges, radius=FILLET2_R)

    # Fillet3
    fillet3_edges = [part.edges().sort_by_distance(p)[0] for p in [
        (-34.5, 0, 145),
        (-32.5, 0, 175),
    ]]
    fillet(fillet3_edges, radius=FILLET3_R - 0.0001)  # a hair under: the kernel refuses the full size

    # Fillet4
    fillet4_edges = [part.edges().sort_by_distance(p)[0] for p in [
        (-32.5, 0, 275),
        (-32.5, 0, 296),
    ]]
    fillet(fillet4_edges, radius=FILLET4_R)

    # Sketch17 → Cut-Extrude3 (cut)
    with BuildSketch(Plane.XY.offset(296)):
        Circle(SKETCH17_R)
    extrude(amount=-CUT_EXTRUDE3_DEPTH, mode=Mode.SUBTRACT)

    # Sketch18 → Cut-Extrude4 (cut)
    with BuildSketch(Plane.ZY.offset(48)):
        with Locations((50, -45)):
            Circle(SKETCH18_R)
    extrude(amount=-CUT_EXTRUDE4_DEPTH, mode=Mode.SUBTRACT)


solid = part.part
